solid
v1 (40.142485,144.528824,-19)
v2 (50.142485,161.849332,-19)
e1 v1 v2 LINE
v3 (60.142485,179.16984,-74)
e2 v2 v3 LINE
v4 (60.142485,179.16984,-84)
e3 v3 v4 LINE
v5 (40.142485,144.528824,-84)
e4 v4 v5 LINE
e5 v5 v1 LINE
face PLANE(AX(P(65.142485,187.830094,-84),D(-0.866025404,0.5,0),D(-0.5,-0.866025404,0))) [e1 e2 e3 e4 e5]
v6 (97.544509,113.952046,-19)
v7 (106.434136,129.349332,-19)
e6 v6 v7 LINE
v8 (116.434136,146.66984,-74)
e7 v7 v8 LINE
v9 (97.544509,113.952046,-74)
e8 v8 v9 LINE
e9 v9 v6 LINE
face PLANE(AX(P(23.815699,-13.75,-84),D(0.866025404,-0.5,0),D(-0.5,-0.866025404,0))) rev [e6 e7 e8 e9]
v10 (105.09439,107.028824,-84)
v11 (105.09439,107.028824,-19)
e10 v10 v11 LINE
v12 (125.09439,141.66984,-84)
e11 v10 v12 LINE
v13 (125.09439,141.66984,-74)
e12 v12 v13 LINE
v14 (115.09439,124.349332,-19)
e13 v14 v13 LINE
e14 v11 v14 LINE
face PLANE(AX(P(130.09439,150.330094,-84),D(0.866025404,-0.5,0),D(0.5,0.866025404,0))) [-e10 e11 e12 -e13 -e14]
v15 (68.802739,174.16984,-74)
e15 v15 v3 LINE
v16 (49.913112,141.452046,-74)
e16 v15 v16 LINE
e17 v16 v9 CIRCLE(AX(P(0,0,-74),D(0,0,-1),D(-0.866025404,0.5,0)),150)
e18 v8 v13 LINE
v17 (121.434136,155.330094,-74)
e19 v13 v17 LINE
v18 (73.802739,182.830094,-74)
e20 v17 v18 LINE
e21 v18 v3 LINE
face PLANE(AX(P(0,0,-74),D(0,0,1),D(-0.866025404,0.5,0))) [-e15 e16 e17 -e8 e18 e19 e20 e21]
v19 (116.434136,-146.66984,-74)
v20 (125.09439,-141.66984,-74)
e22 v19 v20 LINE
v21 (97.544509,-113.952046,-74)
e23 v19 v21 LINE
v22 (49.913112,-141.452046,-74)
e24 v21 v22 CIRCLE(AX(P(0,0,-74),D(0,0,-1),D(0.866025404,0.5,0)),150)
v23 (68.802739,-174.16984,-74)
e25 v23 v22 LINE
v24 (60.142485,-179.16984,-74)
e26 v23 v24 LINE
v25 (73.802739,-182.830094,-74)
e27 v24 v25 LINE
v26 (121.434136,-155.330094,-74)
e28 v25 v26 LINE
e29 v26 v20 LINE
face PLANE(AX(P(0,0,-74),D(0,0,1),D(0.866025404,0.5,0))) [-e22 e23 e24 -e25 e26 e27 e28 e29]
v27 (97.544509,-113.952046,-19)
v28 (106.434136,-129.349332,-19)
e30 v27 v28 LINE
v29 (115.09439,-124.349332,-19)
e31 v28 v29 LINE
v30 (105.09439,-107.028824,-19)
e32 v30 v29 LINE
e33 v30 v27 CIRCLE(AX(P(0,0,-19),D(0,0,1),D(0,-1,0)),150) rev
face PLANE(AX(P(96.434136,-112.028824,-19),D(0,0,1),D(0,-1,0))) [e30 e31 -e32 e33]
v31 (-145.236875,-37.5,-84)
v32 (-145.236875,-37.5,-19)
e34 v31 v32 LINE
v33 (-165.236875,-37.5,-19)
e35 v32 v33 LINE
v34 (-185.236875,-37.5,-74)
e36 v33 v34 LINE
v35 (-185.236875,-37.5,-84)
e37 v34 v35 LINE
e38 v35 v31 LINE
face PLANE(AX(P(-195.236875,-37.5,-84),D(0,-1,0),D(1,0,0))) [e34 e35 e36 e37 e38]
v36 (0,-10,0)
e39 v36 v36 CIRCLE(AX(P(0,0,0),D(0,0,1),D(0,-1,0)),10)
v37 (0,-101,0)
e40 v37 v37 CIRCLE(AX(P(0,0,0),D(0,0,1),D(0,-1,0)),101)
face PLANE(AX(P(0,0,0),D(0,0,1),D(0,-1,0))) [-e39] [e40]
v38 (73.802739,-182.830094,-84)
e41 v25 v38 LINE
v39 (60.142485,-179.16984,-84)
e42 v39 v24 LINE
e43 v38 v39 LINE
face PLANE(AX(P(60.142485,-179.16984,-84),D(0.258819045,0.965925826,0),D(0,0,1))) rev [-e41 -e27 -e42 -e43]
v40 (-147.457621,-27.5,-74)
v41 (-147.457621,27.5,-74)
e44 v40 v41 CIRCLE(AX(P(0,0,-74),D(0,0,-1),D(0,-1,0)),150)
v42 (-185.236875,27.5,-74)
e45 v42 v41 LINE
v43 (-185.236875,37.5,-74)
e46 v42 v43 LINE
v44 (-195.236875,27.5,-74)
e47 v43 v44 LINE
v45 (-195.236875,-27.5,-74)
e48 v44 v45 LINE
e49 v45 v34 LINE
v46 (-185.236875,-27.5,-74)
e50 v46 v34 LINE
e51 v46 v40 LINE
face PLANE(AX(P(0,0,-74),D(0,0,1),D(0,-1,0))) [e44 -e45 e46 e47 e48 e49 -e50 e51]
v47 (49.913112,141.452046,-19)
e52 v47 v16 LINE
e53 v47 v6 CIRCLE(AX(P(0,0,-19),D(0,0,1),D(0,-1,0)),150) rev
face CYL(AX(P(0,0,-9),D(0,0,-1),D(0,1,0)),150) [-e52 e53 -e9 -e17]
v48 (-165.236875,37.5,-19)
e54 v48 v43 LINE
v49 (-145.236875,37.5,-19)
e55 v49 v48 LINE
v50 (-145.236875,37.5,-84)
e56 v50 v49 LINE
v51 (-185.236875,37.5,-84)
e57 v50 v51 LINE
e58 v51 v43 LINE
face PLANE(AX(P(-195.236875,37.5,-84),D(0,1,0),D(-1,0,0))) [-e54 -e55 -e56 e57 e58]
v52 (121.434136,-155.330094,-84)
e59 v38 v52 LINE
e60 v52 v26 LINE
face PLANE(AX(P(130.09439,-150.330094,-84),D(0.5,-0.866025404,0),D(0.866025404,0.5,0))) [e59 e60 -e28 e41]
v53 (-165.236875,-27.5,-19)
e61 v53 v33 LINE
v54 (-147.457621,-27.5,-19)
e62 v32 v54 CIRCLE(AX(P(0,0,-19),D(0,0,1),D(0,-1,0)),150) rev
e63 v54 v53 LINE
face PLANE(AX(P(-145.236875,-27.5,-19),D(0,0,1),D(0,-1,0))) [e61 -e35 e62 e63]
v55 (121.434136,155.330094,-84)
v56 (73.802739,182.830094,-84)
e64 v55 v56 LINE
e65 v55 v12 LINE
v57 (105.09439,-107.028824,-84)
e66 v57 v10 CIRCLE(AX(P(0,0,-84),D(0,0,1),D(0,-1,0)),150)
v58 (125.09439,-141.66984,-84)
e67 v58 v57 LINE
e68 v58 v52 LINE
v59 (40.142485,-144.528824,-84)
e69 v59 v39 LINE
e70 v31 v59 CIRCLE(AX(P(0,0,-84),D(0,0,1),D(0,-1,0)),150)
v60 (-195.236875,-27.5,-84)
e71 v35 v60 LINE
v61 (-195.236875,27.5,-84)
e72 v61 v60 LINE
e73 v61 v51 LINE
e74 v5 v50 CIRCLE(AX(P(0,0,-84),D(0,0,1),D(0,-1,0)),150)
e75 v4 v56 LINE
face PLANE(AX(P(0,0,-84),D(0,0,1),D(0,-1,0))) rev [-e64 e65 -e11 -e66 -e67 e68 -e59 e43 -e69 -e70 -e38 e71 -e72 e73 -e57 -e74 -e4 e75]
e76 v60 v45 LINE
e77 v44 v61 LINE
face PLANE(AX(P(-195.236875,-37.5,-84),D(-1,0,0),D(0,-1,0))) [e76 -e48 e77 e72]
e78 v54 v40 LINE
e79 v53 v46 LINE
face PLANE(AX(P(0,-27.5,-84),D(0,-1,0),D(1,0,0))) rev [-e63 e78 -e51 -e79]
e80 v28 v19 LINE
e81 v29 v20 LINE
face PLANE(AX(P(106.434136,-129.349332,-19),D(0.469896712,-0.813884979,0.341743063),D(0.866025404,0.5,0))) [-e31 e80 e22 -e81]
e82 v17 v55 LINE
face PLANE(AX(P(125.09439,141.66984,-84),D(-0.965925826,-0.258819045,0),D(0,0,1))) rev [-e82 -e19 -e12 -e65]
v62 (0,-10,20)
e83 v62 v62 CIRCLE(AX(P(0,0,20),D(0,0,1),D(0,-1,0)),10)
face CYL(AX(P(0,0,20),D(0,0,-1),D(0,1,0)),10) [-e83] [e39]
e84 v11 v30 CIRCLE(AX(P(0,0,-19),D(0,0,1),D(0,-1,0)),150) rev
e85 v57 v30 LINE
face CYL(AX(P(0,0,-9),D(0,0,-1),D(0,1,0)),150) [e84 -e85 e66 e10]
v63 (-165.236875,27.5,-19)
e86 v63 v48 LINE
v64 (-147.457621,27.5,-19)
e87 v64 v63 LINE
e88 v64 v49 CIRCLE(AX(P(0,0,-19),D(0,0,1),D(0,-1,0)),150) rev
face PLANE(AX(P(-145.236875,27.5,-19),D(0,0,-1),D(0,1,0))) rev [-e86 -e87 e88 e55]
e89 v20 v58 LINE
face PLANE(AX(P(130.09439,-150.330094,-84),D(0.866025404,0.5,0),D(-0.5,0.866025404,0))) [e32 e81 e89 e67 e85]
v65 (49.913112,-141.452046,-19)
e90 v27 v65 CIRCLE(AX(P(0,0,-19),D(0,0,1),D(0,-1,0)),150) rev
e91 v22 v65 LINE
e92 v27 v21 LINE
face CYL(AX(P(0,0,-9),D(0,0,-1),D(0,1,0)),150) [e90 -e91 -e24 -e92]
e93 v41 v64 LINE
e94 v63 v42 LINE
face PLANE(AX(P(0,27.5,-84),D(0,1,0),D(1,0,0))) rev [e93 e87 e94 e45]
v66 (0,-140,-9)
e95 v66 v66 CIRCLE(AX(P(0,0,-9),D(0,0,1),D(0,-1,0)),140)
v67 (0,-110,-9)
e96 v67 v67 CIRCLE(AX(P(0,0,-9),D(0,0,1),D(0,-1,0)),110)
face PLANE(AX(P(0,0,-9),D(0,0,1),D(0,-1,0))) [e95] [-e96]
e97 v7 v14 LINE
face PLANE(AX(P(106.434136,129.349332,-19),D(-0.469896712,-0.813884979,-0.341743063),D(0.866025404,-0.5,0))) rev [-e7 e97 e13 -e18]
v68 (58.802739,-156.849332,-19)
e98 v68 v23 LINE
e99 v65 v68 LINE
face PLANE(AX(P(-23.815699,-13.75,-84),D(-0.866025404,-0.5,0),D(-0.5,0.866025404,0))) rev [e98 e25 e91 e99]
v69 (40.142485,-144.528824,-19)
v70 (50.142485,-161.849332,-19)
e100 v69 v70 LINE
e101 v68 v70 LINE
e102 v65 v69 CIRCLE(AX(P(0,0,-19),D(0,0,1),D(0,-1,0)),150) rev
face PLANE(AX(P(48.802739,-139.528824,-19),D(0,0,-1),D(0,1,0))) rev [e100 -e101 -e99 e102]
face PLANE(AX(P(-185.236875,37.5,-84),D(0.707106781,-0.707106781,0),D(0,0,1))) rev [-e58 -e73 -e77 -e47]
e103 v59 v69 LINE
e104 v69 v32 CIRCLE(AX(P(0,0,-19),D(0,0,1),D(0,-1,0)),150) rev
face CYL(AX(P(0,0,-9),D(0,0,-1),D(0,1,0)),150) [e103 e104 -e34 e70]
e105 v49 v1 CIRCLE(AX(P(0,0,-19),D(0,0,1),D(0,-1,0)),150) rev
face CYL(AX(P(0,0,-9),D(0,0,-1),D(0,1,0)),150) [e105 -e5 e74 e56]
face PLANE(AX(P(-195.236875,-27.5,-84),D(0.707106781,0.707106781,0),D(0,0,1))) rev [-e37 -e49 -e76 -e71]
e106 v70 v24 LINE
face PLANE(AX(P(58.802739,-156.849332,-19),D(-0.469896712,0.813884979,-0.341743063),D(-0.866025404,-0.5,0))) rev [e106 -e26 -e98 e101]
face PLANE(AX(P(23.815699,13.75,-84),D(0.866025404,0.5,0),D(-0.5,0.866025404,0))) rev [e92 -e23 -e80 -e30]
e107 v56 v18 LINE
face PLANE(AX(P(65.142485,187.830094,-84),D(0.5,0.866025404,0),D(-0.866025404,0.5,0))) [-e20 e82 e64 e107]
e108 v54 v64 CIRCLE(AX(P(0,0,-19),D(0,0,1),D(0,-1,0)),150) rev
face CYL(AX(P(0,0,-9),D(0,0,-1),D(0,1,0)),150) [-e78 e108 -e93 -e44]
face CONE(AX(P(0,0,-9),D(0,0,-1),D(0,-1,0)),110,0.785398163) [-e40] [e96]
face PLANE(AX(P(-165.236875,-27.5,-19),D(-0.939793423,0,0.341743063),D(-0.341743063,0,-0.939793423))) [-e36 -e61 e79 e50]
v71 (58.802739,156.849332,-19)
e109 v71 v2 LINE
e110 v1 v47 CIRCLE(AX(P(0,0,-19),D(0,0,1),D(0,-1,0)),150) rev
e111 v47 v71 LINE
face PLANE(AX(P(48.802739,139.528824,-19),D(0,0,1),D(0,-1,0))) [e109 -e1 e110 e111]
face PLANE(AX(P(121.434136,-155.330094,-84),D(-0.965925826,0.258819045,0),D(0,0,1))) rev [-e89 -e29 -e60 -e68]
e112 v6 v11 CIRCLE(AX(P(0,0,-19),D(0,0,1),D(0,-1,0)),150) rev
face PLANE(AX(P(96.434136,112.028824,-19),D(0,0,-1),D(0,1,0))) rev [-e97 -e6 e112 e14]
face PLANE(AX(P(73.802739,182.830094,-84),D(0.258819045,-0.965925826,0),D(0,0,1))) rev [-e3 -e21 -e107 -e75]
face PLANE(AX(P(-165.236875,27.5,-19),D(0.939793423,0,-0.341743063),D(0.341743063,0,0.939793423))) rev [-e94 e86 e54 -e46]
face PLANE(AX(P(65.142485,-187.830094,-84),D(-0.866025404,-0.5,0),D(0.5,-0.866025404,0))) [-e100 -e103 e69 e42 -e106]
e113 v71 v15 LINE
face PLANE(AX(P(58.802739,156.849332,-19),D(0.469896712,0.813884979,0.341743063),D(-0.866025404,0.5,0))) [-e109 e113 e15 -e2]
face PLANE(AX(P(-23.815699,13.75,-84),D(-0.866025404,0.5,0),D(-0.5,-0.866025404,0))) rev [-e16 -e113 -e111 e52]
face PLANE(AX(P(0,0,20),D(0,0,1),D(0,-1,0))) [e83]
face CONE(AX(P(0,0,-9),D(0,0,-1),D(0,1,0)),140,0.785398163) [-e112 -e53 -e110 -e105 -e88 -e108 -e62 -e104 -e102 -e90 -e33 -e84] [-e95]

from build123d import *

# Parameters (mm, degrees)
SKETCH1_R                    = 150
BOSS_EXTRUDE1_DEPTH          = 75
CHAMFER1_SIZE                = 10
BOSS_EXTRUDE2_START          = -75
BOSS_EXTRUDE2_DEPTH          = 10
CHAMFER2_SIZE                = 10
BOSS_EXTRUDE3_DEPTH          = 10
CIRPATTERN2_COUNT            = 3
CIRPATTERN2_COPY_1_DEPTH     = 10
CIRPATTERN2_COPY_2_DEPTH     = 10
CHAMFER2_OF_CIRPATTERN2_SIZE = 10
SKETCH4_R                    = 110
BOSS_EXTRUDE4_DEPTH          = 9
BOSS_EXTRUDE4_TAPER          = 45
SKETCH5_R                    = 10
BOSS_EXTRUDE5_DEPTH          = 20
BODY_MOVE_COPY1_ANGLE        = 90


with BuildPart() as part:
    # Sketch1 → Boss-Extrude1 (new body)
    with BuildSketch(Plane(origin=(0, 0, 0), x_dir=(1, 0, 0), z_dir=(0, 1, 0))):
        with Locations(Location((0, 0, 0), (0, 0, 270))):
            Circle(SKETCH1_R)
    extrude(amount=BOSS_EXTRUDE1_DEPTH)

    # Chamfer1
    chamfer1_edges = [part.edges().sort_by_distance(p)[0] for p in [
        (0, 75, -150),
    ]]
    chamfer(chamfer1_edges, length=CHAMFER1_SIZE)

    # Sketch2 → Boss-Extrude2 (add)
    with BuildSketch(Plane(origin=(0, 75, 0), x_dir=(1, 0, 0), z_dir=(0, 1, 0)).offset(BOSS_EXTRUDE2_START)):
        with BuildLine():
            Line((-195.236875483, -37.5), (-195.236875483, 37.5))
            Line((-195.236875483, 37.5), (-145.236875483, 37.5))
            ThreePointArc((-145.236875483, 37.5), (-150, 0), (-145.236875483, -37.5))
            Line((-145.236875483, -37.5), (-195.236875483, -37.5))
        make_face()
    boss_extrude2 = extrude(amount=BOSS_EXTRUDE2_DEPTH)

    # Chamfer2
    chamfer2_edges = [part.edges().sort_by_distance(p)[0] for p in [
        (-195.236875483, 5, -37.5),
        (-195.236875483, 5, 37.5),
    ]]
    chamfer(chamfer2_edges, length=CHAMFER2_SIZE)

    # Sketch3 → Boss-Extrude3 (add)
    with BuildSketch(Plane.XY.offset(37.5)):
        Polygon((-145.236875483, 10), (-145.236875483, 65), (-165.236875483, 65), (-185.236875483, 10), align=None)
    boss_extrude3 = extrude(amount=-BOSS_EXTRUDE3_DEPTH)

    # Mirror3: Boss-Extrude3 across plane
    add(boss_extrude3.mirror(Plane.XY))

    # CirPattern2: Boss-Extrude2, Boss-Extrude3 ×3 about axis
    cirpattern2_axis = Axis((0, 0, 0), (0, 1, 0))
    add([boss_extrude2.rotate(cirpattern2_axis, i * 360 / CIRPATTERN2_COUNT) for i in range(1, CIRPATTERN2_COUNT)])
    add([boss_extrude3.rotate(cirpattern2_axis, i * 360 / CIRPATTERN2_COUNT) for i in range(1, CIRPATTERN2_COUNT)])

    # CirPattern2 copy 1 sketch → CirPattern2 copy 1 (add)
    with BuildSketch(Plane(origin=(-32.475952642, 0, 18.75), x_dir=(-0.4999999999999998, 0, -0.8660254037844387), z_dir=(-0.8660254037844387, 0, 0.4999999999999998))):
        Polygon((-145.236875483, -10), (-145.236875483, -65), (-165.236875483, -65), (-185.236875483, -10), align=None)
    extrude(amount=-CIRPATTERN2_COPY_1_DEPTH)

    # CirPattern2 copy 2 sketch → CirPattern2 copy 2 (add)
    with BuildSketch(Plane(origin=(32.475952642, 0, 18.75), x_dir=(-0.5000000000000004, 0, 0.8660254037844384), z_dir=(0.8660254037844384, 0, 0.5000000000000004))):
        Polygon((-145.236875483, -10), (-145.236875483, -65), (-165.236875483, -65), (-185.236875483, -10), align=None)
    extrude(amount=-CIRPATTERN2_COPY_2_DEPTH)

    # Chamfer2 of CirPattern2
    chamfer2_of_cirpattern2_edges = [part.edges().sort_by_distance(p)[0] for p in [
        (65.142485099, 5, 187.830093924),
        (130.094390383, 5, 150.330093924),
        (130.094390383, 5, -150.330093924),
        (65.142485099, 5, -187.830093924),
    ]]
    chamfer(chamfer2_of_cirpattern2_edges, length=CHAMFER2_OF_CIRPATTERN2_SIZE)

    # Sketch4 → Boss-Extrude4 (add)
    with BuildSketch(Plane(origin=(0, 75, 0), x_dir=(1, 0, 0), z_dir=(0, 1, 0))):
        Circle(SKETCH4_R)
    extrude(amount=BOSS_EXTRUDE4_DEPTH, taper=BOSS_EXTRUDE4_TAPER)

    # Sketch5 → Boss-Extrude5 (add)
    with BuildSketch(Plane(origin=(0, 84, 0), x_dir=(1, 0, 0), z_dir=(0, 1, 0))):
        with Locations(Location((0, 0, 0), (0, 0, 270))):
            Circle(SKETCH5_R)
    extrude(amount=BOSS_EXTRUDE5_DEPTH)


with BuildPart() as part_1:
    # Body-Move/Copy1: read off the stored shape, not the designer's step
    # Body-Move/Copy1: moved
    add(part.part.rotate(Axis((0, 0, 0), (1, 0, 0)), BODY_MOVE_COPY1_ANGLE))


with BuildPart() as part_2:
    # Body-Move/Copy2: moved
    add(part_1.part.moved(Location((5e-08, 0, -83.99999995))))


solid = part_2.part
